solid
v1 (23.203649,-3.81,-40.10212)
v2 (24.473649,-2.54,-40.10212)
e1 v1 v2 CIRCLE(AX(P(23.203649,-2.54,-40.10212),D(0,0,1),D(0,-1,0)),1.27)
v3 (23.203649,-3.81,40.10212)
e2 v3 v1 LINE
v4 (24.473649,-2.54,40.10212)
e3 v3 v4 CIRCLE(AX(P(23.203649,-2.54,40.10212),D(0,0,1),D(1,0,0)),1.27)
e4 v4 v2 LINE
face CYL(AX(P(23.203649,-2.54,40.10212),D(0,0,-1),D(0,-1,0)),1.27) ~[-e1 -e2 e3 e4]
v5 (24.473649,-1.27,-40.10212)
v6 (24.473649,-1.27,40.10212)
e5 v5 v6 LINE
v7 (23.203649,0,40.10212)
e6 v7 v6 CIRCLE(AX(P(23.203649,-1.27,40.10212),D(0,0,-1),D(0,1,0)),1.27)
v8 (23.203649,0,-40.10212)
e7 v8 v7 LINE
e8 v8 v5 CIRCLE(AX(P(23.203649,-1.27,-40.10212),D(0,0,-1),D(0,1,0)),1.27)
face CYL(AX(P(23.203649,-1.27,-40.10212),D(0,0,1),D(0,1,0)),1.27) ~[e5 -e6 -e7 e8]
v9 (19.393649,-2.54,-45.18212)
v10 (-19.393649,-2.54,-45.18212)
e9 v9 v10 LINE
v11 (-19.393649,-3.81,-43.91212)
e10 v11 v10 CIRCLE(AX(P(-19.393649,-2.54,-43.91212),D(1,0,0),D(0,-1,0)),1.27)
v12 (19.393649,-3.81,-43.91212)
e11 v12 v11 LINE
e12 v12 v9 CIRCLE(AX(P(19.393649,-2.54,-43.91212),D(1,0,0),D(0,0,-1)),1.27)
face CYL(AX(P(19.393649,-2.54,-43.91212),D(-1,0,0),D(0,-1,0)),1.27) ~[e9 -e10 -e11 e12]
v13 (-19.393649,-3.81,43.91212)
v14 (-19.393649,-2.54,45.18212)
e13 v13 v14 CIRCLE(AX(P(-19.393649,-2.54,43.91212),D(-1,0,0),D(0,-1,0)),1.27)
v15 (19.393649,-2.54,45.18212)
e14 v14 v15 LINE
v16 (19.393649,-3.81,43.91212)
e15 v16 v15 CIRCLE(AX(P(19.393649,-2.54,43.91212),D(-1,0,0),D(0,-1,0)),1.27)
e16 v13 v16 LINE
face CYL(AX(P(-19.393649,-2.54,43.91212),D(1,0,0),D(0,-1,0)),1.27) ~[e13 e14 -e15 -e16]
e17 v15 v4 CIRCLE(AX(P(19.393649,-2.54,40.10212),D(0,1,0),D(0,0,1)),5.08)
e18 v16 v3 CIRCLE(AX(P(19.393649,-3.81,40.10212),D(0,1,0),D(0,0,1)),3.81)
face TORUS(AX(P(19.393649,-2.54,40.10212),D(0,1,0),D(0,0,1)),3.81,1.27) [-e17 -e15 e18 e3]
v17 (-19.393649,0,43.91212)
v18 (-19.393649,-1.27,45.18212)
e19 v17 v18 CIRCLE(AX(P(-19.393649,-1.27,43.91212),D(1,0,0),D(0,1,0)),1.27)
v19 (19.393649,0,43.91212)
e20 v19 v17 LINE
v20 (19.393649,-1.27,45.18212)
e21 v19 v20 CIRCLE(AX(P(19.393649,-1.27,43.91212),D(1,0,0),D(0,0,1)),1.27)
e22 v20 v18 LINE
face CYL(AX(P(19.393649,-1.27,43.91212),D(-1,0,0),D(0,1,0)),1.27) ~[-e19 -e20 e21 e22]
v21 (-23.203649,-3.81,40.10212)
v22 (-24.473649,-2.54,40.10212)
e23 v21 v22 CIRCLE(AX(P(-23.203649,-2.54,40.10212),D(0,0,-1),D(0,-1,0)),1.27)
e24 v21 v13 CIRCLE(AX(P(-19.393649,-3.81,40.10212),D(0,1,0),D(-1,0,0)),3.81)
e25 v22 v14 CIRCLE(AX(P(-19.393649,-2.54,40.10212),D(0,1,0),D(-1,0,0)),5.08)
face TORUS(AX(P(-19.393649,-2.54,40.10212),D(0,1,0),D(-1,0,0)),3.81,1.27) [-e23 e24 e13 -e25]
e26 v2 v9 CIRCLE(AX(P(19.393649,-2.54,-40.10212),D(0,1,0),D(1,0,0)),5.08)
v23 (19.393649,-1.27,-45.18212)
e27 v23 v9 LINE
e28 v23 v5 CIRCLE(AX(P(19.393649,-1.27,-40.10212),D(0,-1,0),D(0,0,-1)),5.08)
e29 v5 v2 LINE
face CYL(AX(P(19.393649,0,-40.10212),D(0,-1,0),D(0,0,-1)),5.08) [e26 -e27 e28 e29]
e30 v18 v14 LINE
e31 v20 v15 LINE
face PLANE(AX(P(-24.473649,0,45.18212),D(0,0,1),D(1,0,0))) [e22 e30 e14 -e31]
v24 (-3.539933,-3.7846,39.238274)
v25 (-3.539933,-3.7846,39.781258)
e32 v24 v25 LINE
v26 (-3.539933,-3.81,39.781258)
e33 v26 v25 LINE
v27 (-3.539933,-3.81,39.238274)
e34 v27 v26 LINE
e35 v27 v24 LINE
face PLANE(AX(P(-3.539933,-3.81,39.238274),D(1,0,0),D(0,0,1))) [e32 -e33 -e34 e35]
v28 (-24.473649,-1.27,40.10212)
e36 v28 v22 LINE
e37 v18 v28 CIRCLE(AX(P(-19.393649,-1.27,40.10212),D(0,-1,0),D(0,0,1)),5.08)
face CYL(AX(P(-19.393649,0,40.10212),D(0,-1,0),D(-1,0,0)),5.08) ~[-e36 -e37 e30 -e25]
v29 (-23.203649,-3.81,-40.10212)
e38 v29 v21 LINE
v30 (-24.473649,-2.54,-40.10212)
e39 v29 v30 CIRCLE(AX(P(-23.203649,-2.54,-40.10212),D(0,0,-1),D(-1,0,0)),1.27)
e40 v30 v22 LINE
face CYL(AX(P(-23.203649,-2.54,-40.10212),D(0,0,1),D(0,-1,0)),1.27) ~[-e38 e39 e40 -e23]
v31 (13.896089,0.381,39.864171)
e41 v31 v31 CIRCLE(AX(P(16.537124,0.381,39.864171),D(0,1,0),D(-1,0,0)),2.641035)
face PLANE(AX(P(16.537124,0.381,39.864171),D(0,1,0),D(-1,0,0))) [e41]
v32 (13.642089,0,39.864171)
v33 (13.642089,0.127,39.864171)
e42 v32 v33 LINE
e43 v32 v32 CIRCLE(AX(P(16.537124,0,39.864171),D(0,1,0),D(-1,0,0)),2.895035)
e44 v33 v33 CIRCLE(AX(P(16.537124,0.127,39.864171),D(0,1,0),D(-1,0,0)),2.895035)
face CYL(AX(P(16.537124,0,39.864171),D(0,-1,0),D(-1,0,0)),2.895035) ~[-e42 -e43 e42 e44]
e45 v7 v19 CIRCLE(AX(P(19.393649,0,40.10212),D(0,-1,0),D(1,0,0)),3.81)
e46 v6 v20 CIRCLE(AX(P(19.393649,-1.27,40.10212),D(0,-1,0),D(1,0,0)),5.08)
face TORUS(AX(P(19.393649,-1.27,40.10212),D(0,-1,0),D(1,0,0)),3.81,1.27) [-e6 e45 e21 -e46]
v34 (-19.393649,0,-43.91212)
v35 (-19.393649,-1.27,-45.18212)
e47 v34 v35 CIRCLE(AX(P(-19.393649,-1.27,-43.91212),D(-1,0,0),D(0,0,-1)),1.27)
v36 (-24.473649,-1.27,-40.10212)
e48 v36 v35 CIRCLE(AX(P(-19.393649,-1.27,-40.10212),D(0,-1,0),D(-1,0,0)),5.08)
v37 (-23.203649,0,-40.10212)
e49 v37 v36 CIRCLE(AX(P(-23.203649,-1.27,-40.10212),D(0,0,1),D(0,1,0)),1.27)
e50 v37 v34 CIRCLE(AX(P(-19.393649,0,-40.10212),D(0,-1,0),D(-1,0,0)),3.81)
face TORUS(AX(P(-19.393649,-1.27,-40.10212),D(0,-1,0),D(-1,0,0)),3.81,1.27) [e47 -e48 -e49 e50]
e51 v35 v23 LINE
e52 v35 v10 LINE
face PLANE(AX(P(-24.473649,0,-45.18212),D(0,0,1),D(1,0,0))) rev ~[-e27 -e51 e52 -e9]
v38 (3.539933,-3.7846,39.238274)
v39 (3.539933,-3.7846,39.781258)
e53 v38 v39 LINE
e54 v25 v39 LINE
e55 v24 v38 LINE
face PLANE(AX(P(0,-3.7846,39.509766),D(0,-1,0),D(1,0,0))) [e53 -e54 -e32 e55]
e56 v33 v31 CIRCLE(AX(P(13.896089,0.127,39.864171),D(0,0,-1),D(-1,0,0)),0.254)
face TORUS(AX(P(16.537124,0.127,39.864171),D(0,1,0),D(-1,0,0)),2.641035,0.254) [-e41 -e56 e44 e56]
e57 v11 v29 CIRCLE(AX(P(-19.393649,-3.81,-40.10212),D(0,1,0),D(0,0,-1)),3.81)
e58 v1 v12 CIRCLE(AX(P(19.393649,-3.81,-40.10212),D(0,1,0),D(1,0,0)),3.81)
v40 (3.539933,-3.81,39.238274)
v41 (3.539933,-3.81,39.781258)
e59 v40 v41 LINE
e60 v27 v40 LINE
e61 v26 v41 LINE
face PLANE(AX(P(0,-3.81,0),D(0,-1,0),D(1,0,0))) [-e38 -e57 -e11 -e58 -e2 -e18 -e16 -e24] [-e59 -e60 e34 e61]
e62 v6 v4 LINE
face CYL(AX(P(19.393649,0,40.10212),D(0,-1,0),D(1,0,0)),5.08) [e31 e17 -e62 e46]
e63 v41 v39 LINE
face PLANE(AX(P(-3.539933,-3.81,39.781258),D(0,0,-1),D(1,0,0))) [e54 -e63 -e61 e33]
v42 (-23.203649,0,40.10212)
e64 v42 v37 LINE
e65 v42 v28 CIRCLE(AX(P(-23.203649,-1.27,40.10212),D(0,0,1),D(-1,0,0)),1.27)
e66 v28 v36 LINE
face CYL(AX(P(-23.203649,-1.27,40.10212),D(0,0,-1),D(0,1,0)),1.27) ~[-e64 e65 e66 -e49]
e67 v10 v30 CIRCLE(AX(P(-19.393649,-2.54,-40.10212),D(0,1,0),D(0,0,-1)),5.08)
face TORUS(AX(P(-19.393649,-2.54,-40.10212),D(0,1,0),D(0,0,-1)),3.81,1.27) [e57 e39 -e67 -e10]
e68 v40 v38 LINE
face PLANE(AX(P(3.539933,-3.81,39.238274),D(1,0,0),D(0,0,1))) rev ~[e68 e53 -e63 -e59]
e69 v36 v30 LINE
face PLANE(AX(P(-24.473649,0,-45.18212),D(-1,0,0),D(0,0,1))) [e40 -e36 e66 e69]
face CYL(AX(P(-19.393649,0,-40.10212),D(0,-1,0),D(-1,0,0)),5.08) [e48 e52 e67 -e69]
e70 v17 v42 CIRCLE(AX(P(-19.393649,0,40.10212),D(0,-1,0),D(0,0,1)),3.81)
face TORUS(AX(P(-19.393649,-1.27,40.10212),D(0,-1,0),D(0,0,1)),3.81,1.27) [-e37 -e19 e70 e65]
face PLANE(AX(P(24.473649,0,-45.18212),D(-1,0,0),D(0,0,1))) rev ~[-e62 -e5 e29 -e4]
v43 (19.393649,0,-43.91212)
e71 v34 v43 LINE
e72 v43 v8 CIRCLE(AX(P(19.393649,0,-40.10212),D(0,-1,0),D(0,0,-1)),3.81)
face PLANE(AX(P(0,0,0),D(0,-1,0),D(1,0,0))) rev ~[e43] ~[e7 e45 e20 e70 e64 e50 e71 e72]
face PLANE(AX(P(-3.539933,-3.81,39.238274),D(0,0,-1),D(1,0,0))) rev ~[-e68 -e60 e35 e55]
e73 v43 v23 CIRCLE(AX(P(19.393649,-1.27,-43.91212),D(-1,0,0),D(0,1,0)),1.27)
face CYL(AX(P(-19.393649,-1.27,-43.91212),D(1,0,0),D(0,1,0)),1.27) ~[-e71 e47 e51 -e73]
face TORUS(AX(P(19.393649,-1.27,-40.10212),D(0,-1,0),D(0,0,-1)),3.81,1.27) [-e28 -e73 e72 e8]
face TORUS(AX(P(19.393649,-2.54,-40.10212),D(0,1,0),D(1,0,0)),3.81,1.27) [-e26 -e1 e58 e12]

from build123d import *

# Parameters (mm, degrees)
F0_W      = 48.9472970366
F0_H      = 90.3642401099
F1_DEPTH  = 3.81
F2_R      = 5.08
F3_R      = 1.27
F4_R      = 1.27
F7_W      = 7.0798662491
F7_H      = 0.5429834127
F8_DEPTH  = 0.0254
F10_R     = 2.8950348496
F11_DEPTH = 0.381
F12_R     = 0.254


# Not quite as in the source:
# - the program builds the solid bodies; features that only make, move or delete a surface that nothing else refers to are left out


with BuildPart() as f1:
    # F0 (on Front) → F1 (new body)
    with BuildSketch(Plane.XZ):
        Rectangle(F0_W, F0_H)
    extrude(amount=F1_DEPTH)

    # F2
    f2_edges = [f1.edges().sort_by_distance(p)[0] for p in [
        (-24.473649, -1.905, 45.18212),
        (24.473649, -1.905, 45.18212),
        (24.473649, -1.905, -45.18212),
        (-24.473649, -1.905, -45.18212),
    ]]
    fillet(f2_edges, radius=F2_R)

    # F3
    f3_edges = [f1.edges().sort_by_distance(p)[0] for p in [
        (24.473649, 0, 0),
    ]]
    fillet(f3_edges, radius=F3_R)

    # F4
    f4_edges = [f1.edges().sort_by_distance(p)[0] for p in [
        (0, -3.81, 45.18212),
    ]]
    fillet(f4_edges, radius=F4_R)

    # F7 (on face) → F8 (cut)
    with BuildSketch(Plane.XZ.offset(3.81)):
        with Locations((0, 39.5097658038)):
            Rectangle(F7_W, F7_H)
    extrude(amount=-F8_DEPTH, mode=Mode.SUBTRACT)

    # F10 (on face) → F11 (join)
    with BuildSketch(Plane(origin=(0, 0, 0), x_dir=(-1, 0, 0), z_dir=(0, 1, 0))):
        with Locations((-16.5371242911, 39.8641712964)):
            Circle(F10_R)
    extrude(amount=F11_DEPTH)

    # F12
    f12_edges = [f1.edges().sort_by_distance(p)[0] for p in [
        (19.432159, 0.381, 39.864171),
    ]]
    fillet(f12_edges, radius=F12_R)


solid = f1.part
